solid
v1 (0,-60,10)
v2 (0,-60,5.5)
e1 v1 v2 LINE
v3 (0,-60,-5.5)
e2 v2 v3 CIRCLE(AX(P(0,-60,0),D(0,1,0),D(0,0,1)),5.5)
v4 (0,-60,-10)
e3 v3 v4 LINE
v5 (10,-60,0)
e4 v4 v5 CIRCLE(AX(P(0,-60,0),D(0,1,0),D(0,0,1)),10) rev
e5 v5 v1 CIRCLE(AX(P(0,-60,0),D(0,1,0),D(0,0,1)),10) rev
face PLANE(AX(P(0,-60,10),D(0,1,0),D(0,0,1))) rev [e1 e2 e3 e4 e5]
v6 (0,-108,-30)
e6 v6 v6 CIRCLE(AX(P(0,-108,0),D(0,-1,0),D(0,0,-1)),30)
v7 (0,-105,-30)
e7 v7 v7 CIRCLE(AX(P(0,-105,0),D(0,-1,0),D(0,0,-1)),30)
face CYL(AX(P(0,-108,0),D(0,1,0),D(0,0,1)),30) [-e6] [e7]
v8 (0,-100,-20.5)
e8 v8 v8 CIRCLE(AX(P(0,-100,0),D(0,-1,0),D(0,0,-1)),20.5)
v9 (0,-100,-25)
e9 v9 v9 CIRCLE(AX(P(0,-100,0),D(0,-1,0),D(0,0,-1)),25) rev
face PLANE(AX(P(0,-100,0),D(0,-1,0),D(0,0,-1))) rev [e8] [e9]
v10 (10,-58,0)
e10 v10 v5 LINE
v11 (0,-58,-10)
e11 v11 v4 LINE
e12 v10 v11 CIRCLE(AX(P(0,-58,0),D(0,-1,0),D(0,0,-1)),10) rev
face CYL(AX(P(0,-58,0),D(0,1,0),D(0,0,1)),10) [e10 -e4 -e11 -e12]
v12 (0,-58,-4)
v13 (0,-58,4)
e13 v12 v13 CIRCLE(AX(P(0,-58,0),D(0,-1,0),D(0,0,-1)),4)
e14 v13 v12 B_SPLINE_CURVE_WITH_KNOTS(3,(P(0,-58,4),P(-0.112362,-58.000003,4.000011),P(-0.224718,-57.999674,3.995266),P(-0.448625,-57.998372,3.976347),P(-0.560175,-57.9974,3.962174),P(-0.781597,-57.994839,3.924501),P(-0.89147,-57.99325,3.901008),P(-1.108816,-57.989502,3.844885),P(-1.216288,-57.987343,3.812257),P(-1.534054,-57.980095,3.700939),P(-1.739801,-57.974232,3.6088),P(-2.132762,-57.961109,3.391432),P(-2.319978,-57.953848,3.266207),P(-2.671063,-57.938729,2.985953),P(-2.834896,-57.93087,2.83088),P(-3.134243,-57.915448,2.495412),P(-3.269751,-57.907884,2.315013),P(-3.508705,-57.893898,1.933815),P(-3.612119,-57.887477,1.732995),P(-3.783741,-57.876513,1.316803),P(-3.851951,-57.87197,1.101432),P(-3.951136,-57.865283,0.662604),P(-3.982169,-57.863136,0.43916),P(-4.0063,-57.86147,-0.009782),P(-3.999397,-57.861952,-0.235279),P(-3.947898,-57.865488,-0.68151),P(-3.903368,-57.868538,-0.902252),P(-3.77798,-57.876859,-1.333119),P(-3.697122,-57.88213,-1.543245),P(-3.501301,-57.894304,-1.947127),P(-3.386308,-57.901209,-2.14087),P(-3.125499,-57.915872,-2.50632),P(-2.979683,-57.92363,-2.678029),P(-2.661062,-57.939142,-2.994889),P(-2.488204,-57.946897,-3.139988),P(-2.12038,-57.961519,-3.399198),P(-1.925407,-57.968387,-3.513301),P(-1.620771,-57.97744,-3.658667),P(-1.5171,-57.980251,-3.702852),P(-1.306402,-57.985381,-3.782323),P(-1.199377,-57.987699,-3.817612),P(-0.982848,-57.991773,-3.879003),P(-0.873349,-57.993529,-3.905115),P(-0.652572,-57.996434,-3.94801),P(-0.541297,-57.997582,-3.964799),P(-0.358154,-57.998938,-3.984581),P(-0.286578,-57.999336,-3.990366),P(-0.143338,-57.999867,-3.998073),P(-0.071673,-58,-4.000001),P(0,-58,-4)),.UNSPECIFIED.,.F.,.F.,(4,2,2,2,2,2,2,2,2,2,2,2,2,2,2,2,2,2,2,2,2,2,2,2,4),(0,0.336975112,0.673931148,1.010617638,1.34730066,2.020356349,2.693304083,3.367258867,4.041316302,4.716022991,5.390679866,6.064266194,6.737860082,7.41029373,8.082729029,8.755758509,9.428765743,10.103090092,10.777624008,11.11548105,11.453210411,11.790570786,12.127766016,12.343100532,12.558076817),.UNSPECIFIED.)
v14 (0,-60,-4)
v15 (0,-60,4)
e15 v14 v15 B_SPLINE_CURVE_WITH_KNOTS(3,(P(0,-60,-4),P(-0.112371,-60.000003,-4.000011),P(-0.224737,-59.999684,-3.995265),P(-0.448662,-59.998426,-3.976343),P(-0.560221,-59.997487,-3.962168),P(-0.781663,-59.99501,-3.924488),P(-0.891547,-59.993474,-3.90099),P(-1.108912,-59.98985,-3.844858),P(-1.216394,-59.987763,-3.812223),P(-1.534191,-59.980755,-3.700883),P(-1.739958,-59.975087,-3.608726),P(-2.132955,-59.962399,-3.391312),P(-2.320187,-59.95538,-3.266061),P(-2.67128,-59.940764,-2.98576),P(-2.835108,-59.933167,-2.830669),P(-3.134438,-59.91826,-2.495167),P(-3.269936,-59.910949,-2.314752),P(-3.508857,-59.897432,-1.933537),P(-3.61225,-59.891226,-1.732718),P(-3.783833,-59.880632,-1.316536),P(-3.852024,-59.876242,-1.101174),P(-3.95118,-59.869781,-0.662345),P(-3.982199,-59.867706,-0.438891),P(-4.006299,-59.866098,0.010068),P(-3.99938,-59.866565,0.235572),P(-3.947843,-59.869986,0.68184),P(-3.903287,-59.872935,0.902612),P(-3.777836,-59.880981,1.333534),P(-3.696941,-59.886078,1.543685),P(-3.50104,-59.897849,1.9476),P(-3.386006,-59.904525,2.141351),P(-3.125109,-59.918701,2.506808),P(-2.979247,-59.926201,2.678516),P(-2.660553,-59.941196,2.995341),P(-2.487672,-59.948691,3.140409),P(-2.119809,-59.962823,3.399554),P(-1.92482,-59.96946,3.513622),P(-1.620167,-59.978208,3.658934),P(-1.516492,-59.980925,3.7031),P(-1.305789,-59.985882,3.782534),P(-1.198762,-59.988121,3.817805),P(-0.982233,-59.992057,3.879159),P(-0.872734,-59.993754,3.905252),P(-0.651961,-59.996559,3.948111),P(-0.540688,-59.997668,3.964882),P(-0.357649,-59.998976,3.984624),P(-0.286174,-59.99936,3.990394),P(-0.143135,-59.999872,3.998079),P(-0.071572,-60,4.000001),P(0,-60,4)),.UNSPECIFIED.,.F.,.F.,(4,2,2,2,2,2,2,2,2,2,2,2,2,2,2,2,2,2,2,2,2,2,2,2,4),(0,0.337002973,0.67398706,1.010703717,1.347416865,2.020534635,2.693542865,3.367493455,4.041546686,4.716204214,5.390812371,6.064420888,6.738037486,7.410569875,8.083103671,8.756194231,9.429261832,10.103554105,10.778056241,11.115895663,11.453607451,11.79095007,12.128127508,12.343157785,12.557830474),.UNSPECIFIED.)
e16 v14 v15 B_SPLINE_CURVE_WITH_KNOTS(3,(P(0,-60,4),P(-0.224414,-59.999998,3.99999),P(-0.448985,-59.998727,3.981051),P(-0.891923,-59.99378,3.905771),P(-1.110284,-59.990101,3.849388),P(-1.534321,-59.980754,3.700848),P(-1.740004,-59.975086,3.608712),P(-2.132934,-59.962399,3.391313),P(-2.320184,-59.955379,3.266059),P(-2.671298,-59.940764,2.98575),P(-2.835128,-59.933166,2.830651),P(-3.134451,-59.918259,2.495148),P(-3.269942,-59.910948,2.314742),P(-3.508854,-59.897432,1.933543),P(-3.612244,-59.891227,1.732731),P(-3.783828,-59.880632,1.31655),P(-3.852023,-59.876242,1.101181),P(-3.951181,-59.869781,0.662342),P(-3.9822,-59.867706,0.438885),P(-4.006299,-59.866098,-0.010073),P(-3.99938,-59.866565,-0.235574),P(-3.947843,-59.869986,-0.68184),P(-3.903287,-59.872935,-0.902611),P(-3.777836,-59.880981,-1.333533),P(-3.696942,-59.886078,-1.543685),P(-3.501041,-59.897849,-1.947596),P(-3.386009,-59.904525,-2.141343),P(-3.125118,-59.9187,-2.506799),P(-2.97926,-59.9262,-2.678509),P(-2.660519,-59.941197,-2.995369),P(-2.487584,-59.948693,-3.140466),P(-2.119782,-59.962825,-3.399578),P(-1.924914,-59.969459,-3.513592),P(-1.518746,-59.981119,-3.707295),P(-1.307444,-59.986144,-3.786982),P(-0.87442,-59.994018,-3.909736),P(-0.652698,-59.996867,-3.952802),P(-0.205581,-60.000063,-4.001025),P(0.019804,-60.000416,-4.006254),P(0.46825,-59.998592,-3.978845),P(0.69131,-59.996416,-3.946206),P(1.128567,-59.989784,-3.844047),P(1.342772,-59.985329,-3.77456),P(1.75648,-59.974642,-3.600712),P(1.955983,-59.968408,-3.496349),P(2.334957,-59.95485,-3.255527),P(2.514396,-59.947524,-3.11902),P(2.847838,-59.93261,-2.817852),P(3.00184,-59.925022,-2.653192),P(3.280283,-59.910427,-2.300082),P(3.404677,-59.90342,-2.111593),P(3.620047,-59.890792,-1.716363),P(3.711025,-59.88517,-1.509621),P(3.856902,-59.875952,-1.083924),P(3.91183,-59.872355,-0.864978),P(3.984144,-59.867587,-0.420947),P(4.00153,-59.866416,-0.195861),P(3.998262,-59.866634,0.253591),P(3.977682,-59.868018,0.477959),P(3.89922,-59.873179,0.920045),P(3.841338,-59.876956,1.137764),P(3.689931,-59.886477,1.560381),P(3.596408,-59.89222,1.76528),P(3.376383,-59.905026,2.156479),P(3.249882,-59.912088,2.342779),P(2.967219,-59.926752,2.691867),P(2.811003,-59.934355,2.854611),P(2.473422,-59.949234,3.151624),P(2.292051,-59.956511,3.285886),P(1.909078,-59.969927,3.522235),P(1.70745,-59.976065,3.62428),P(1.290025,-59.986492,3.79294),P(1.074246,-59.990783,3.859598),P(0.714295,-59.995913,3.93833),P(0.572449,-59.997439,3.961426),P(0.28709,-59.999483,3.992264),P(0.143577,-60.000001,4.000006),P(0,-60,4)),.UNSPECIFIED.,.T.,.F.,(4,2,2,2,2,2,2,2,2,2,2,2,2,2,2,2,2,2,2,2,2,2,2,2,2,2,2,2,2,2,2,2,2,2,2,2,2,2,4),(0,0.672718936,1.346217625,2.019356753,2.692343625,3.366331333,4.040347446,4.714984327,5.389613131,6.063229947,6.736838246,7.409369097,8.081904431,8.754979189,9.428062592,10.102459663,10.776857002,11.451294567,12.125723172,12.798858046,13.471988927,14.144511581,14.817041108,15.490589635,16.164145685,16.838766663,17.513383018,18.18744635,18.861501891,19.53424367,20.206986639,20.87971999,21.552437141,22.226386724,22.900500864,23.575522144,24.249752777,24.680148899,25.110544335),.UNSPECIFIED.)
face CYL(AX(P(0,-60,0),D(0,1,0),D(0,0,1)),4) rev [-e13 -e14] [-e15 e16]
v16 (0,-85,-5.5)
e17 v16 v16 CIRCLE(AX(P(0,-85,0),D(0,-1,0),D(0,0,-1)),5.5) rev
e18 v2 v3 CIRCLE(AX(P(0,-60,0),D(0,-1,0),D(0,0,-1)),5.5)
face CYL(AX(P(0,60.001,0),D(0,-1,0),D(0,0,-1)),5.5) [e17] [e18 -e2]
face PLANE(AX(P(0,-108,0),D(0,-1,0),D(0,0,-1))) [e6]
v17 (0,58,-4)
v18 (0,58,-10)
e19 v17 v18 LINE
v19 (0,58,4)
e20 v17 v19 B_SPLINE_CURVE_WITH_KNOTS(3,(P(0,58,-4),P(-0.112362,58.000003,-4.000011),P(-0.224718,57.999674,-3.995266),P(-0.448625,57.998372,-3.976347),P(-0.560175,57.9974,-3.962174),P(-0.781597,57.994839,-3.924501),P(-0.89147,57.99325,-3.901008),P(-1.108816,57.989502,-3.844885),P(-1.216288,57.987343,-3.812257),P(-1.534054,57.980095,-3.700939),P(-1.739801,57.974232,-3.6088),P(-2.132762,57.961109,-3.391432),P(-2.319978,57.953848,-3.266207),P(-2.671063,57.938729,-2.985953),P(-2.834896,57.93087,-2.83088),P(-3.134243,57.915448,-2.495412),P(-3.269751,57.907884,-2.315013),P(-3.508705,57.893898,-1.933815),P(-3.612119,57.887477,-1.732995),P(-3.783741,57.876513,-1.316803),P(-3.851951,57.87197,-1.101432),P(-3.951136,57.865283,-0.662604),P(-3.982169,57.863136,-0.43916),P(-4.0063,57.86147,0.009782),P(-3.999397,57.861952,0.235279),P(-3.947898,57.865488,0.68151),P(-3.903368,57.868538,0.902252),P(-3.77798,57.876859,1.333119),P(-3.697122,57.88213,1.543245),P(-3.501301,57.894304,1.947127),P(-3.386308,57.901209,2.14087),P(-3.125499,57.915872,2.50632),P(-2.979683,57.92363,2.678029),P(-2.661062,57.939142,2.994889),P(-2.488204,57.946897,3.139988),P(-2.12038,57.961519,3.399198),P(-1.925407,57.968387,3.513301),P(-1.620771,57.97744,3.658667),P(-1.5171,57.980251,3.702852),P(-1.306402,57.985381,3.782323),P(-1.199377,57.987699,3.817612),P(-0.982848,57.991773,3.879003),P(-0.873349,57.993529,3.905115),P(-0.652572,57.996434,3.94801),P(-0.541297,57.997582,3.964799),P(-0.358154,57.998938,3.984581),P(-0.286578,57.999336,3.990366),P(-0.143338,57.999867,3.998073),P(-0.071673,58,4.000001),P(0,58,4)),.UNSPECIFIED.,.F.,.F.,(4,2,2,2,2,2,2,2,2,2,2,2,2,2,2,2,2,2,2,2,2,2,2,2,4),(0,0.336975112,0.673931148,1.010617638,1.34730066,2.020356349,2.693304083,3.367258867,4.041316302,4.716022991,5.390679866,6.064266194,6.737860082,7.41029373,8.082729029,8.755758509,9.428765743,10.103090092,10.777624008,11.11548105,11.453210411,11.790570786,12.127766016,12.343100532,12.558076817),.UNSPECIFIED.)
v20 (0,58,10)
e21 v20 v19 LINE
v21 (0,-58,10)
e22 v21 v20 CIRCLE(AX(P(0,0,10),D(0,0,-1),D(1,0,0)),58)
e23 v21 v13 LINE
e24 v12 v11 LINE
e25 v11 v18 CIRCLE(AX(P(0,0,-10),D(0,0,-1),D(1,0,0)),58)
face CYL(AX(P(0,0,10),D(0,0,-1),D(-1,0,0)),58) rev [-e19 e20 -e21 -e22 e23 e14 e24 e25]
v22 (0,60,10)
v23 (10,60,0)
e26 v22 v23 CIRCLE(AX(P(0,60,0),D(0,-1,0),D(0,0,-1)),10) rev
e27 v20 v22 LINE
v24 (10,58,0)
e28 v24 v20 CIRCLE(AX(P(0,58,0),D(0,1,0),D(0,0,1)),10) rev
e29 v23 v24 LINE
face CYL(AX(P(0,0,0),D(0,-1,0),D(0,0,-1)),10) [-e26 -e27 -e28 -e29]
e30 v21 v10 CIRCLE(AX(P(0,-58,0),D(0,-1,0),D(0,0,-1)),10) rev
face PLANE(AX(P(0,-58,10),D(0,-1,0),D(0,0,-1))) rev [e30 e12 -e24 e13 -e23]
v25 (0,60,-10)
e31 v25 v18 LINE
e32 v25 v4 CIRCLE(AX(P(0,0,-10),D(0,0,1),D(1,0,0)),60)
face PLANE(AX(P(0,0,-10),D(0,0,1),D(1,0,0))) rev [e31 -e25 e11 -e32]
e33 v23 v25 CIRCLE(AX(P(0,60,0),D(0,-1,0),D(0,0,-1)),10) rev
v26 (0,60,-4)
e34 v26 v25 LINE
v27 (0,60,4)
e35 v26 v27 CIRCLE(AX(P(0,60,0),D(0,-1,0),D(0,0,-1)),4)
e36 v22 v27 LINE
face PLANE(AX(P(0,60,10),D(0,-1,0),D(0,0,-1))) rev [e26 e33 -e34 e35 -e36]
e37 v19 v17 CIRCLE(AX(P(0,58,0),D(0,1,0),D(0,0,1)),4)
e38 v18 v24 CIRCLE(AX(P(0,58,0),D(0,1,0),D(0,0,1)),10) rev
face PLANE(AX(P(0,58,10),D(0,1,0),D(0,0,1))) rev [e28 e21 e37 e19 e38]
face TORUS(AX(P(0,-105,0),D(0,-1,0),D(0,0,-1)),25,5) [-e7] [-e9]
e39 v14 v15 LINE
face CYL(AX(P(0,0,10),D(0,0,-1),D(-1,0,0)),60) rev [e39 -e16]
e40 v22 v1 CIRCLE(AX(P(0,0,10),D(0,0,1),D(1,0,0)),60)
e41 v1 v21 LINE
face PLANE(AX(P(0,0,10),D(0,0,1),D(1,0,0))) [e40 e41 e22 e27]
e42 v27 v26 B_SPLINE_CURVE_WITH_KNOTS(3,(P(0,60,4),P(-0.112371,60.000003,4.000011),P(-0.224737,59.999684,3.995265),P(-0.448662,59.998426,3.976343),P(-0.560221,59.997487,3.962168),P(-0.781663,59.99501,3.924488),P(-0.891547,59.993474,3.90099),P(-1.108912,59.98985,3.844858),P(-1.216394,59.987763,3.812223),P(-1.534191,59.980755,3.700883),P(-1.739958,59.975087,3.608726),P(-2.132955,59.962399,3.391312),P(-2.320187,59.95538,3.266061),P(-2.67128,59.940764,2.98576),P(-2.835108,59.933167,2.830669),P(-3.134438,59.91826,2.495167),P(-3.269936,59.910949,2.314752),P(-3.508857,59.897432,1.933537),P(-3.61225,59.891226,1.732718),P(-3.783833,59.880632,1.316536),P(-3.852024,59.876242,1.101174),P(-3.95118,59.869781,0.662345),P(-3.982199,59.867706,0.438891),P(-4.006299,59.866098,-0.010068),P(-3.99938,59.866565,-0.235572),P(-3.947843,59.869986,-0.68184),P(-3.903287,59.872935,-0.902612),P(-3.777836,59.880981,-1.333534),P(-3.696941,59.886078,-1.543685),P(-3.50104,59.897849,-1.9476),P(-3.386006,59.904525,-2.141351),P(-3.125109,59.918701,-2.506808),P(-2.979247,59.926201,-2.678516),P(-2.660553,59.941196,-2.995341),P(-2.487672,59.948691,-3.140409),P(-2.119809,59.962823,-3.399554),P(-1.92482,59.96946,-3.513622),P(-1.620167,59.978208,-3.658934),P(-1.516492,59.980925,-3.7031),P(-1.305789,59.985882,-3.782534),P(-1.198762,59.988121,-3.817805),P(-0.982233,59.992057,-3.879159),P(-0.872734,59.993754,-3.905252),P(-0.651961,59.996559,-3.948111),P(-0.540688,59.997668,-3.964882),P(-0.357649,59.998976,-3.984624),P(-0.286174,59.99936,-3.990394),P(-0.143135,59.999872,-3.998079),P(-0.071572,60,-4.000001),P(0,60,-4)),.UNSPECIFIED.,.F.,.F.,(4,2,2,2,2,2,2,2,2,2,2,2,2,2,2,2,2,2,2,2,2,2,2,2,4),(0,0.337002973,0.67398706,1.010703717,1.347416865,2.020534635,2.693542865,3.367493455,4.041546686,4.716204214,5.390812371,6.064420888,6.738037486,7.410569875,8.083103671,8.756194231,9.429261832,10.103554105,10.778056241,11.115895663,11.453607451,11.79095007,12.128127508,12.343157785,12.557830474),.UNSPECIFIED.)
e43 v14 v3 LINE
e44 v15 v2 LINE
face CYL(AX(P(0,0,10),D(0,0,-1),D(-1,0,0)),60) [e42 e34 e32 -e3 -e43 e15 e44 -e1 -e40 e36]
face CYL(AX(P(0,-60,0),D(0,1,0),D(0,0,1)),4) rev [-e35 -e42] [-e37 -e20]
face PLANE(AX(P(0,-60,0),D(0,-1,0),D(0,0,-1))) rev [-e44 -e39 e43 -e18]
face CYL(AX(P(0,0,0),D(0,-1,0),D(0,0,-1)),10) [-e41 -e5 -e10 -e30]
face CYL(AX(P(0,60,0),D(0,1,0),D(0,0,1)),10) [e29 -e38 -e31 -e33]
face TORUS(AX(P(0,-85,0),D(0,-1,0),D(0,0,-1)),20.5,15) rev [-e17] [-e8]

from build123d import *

# Parameters (mm, degrees)
BOSS_EXTRUDE1_DEPTH     = 10
CUT_EXTRUDE1_DEPTH      = 135.536240471
CUT_EXTRUDE1_DEPTH_BACK = 135.536240471
SKETCH3_R               = 4
FILLET1_R               = 10
BOSS_EXTRUDE2_OUTLINE_R = 5.5
BOSS_EXTRUDE2_DEPTH     = 40
BOSS_EXTRUDE2_START     = -5.5
BOSS_EXTRUDE2_2_DEPTH   = 11
SKETCH5_R               = 30
BOSS_EXTRUDE3_DEPTH     = 8
FILLET2_R               = 15
FILLET3_R               = 5


with BuildPart() as part:
    # Sketch2 → Boss-Extrude1 (new, symmetric)
    with BuildSketch(Plane.XY):
        with BuildLine():
            Line((0, 60), (10, 60))
            Line((10, 60), (10, 58))
            Line((10, 58), (0, 58))
            ThreePointArc((0, 58), (-58, 0), (0, -58))
            Line((0, -58), (10, -58))
            Line((10, -58), (10, -60))
            Line((10, -60), (0, -60))
            ThreePointArc((0, -60), (-60, 0), (0, 60))
        make_face()
    extrude(amount=BOSS_EXTRUDE1_DEPTH, both=True)

    # Sketch3 → Cut-Extrude1 (cut, two sides: drawn at the far end of the back side and taken through both)
    with BuildSketch(Plane(origin=(0, 60, 0), x_dir=(1, 0, 0), z_dir=(0, 1, 0)).offset(-CUT_EXTRUDE1_DEPTH_BACK)):
        with Locations(Location((0, 0, 0), (0, 0, 270))):
            Circle(SKETCH3_R)
    extrude(amount=CUT_EXTRUDE1_DEPTH + CUT_EXTRUDE1_DEPTH_BACK, mode=Mode.SUBTRACT)

    # Fillet1
    fillet1_edges = [part.edges().sort_by_distance(p)[0] for p in [
        (10, -59, -10),
        (10, -59, 10),
        (10, 59, -10),
        (10, 59, 10),
    ]]
    fillet(fillet1_edges, radius=FILLET1_R - 0.0001)  # a hair under: the kernel refuses the full size

    # Boss-Extrude2: read off the stored shape, not the designer's step
    # Boss-Extrude2 outline → Boss-Extrude2 (add)
    with BuildSketch(Plane.XZ.offset(60)):
        Circle(BOSS_EXTRUDE2_OUTLINE_R)
    extrude(amount=BOSS_EXTRUDE2_DEPTH)

    # Boss-Extrude2 2 outline → Boss-Extrude2 2 (add)
    with BuildSketch(Plane.XY.offset(BOSS_EXTRUDE2_START)):
        with BuildLine():
            Line((5, -59.799688591), (4.000851892, -59.866461263))
            ThreePointArc((4.000851892, -59.866461263), (2.001539936, -59.966606023), (0, -60))
            Line((0, -60), (5, -60))
            Line((5, -60), (5, -59.799688591))
        make_face()
    extrude(amount=BOSS_EXTRUDE2_2_DEPTH)

    # Sketch5 → Boss-Extrude3 (add)
    with BuildSketch(Plane.XZ.offset(100)):
        with Locations(Location((0, 0, 0), (0, 0, 270))):
            Circle(SKETCH5_R)
    extrude(amount=BOSS_EXTRUDE3_DEPTH)

    # Fillet2
    fillet2_edges = [part.edges().sort_by_distance(p)[0] for p in [
        (-5.5, -100, 0),
    ]]
    fillet(fillet2_edges, radius=FILLET2_R)

    # Fillet3
    fillet3_edges = [part.edges().sort_by_distance(p)[0] for p in [
        (0, -100, 30),
    ]]
    fillet(fillet3_edges, radius=FILLET3_R)


solid = part.part
